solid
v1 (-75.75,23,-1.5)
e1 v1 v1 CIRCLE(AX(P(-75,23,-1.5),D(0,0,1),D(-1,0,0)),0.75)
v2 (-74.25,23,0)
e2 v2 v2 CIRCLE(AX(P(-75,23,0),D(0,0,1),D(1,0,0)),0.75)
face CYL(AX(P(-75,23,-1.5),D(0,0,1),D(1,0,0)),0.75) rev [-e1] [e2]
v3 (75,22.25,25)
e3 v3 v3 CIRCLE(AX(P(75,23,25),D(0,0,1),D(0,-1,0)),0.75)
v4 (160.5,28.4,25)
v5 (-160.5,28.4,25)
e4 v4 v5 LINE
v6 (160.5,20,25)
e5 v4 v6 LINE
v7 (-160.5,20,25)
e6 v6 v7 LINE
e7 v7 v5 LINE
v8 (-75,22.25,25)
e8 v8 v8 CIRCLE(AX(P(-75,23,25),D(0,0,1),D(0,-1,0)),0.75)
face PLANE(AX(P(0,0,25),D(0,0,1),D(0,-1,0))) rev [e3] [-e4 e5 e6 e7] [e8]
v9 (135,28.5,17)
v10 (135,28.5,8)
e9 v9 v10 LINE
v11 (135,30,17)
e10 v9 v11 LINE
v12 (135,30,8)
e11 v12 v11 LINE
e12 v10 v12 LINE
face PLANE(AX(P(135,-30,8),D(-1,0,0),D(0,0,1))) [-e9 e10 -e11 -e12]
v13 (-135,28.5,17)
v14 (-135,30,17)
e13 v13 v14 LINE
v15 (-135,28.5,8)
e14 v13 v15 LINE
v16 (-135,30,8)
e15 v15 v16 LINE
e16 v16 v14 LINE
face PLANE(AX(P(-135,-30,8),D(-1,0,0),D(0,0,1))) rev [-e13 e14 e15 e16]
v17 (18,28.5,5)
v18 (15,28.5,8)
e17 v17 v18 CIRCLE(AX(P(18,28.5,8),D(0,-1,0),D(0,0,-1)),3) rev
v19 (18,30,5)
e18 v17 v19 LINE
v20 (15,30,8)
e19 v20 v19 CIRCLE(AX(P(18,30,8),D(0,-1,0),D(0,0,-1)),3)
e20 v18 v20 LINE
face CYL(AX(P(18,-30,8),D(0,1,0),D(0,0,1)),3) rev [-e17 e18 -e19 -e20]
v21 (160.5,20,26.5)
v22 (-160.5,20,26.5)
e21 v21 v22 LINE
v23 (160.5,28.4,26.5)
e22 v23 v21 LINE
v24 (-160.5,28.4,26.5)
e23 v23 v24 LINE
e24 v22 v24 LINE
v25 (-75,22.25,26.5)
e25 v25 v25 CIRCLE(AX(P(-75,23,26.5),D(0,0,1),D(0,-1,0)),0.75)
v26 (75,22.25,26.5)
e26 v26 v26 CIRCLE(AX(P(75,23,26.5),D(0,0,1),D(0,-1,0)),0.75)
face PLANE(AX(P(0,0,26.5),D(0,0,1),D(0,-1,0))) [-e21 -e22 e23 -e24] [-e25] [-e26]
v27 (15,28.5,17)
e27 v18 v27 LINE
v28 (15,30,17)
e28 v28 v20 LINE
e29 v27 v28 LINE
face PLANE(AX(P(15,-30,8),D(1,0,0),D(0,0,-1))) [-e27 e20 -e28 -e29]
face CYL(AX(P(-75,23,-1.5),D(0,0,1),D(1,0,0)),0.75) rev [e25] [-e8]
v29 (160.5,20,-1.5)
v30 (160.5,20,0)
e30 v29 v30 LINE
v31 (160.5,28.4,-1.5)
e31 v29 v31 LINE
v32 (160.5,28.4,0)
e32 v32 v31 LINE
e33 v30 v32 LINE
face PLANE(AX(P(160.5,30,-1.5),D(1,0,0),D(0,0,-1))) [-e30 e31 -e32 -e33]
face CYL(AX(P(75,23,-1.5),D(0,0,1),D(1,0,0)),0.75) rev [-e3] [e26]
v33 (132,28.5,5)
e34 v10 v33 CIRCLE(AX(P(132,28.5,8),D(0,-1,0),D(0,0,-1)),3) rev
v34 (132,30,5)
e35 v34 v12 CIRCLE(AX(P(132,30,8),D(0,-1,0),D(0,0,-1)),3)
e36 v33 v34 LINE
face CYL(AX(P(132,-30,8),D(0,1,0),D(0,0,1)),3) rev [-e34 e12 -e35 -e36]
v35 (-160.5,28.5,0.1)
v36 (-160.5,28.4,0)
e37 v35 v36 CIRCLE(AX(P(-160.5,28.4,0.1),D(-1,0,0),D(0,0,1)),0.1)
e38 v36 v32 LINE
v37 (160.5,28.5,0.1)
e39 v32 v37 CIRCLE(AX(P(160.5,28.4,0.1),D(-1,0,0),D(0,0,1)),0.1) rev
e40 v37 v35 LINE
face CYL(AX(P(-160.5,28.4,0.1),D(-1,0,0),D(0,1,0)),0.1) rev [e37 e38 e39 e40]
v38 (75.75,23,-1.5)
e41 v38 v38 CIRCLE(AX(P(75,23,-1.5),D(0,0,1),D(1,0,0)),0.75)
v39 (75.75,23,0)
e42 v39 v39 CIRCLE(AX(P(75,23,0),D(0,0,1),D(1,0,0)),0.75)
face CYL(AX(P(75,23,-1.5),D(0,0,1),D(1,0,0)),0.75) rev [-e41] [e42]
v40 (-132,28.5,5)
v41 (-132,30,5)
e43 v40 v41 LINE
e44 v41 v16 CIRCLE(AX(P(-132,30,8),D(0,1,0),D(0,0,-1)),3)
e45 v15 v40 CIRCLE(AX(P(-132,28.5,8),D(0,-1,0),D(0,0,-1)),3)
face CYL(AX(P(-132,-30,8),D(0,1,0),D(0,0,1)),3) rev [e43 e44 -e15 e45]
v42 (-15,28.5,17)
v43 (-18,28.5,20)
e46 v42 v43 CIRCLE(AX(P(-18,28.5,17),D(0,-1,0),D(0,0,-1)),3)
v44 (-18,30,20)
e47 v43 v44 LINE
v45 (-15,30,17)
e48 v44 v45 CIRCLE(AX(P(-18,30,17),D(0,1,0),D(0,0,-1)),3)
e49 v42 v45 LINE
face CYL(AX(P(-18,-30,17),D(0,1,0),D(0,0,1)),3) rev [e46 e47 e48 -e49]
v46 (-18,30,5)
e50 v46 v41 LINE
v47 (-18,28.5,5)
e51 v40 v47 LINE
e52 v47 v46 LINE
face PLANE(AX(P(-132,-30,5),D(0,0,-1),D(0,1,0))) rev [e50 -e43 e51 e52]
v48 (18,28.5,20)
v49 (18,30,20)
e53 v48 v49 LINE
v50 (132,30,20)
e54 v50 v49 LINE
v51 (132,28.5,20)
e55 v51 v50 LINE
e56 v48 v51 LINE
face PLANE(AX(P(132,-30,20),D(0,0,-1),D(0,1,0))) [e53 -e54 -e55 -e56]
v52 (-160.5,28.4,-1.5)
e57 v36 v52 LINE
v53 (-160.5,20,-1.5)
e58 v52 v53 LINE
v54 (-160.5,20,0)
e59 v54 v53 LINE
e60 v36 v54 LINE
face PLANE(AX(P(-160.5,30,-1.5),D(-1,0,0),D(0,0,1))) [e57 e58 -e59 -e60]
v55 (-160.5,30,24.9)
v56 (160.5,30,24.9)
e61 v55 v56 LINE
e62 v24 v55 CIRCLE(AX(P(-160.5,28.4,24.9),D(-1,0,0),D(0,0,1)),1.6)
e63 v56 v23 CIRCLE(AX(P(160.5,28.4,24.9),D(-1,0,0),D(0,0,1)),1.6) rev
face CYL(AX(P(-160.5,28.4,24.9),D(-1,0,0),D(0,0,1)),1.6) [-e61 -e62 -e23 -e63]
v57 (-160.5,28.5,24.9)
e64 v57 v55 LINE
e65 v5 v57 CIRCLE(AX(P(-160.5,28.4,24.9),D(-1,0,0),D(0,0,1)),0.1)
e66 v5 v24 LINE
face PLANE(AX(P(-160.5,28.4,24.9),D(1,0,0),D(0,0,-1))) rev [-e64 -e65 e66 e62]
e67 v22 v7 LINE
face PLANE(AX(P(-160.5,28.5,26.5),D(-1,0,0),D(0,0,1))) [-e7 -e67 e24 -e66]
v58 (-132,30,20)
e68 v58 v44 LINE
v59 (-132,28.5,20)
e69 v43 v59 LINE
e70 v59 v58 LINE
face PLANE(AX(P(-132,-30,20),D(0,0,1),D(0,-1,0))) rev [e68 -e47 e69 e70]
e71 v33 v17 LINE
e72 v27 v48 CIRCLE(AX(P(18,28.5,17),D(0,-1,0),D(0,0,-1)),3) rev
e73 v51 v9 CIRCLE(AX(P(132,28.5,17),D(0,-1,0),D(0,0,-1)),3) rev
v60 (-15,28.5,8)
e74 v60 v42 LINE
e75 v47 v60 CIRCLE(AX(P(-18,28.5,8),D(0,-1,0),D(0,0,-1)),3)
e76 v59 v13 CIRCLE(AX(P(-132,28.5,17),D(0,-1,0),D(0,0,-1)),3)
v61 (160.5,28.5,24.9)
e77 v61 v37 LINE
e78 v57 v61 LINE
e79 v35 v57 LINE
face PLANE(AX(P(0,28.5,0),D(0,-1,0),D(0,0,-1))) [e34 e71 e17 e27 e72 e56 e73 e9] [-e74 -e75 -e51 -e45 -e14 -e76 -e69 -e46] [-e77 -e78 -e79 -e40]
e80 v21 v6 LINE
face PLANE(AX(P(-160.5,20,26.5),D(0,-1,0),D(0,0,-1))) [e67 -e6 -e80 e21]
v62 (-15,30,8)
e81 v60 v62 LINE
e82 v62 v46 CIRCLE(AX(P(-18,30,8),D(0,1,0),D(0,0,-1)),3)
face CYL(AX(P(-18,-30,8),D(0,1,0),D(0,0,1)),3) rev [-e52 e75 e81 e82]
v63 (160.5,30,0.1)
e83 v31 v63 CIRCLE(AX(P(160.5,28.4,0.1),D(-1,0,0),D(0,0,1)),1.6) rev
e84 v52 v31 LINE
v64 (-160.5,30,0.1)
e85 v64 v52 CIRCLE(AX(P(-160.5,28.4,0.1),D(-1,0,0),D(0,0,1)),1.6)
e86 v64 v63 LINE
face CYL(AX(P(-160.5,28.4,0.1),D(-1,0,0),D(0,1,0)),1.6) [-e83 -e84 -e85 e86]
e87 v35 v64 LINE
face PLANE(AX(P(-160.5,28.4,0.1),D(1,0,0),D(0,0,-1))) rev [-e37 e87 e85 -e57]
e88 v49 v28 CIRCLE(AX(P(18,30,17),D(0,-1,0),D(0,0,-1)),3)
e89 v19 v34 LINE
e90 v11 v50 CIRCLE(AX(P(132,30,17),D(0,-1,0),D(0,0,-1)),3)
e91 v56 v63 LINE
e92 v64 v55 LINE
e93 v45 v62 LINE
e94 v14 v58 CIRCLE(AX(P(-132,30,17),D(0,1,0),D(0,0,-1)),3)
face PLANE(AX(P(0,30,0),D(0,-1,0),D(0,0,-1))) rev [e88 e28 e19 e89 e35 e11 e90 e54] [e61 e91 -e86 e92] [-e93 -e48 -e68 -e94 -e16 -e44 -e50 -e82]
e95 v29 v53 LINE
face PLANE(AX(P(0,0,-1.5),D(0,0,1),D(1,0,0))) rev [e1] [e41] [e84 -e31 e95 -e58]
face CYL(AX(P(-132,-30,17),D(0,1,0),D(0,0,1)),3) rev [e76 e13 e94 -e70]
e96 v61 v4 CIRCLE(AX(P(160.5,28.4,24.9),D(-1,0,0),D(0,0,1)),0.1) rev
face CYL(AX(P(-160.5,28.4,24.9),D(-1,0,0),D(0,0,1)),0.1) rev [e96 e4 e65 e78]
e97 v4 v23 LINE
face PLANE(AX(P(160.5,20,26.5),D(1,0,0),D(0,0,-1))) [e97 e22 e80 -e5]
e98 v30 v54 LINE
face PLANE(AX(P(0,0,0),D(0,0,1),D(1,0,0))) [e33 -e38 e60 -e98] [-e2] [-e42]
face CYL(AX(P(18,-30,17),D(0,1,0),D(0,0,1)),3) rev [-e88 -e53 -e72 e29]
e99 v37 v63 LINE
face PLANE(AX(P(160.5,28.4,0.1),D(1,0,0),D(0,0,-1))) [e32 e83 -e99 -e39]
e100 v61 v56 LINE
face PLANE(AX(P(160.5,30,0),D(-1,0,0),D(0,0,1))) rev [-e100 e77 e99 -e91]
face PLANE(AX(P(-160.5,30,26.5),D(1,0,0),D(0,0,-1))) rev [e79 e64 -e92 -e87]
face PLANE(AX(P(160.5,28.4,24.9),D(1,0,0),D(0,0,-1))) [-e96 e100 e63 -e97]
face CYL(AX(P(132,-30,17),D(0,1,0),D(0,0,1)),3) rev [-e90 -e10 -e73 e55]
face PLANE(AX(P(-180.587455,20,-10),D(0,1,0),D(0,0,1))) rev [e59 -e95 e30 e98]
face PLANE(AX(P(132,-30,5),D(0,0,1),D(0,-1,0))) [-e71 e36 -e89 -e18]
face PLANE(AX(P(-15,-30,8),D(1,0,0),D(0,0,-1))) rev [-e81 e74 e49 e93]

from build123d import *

# Parameters (mm, degrees)
SKETCH_1_W                         = 321
SKETCH_1_H                         = 60
SM_BASE_FLANGE_1_DEPTH             = 1.5
SM_EDGE_FLANGE_1_STRIP_W           = 6.2
SM_EDGE_FLANGE_1_STRIP_H           = 1.5
SM_EDGE_FLANGE_1_STRIP_CUT_DEPTH   = 321
SM_EDGE_FLANGE_1_STRIP_2_W         = 6.2
SM_EDGE_FLANGE_1_STRIP_2_H         = 1.5
SM_EDGE_FLANGE_1_STRIP_CUT_2_DEPTH = 321
SM_EDGE_FLANGE_1_DEPTH             = 321
SM_EDGE_FLANGE_1_BEND_DEPTH        = 321
SM_EDGE_FLANGE_2_STRIP_W           = 6.2
SM_EDGE_FLANGE_2_STRIP_H           = 1.5
SM_EDGE_FLANGE_2_STRIP_CUT_DEPTH   = 321
SM_EDGE_FLANGE_2_STRIP_2_W         = 6.2
SM_EDGE_FLANGE_2_STRIP_2_H         = 1.5
SM_EDGE_FLANGE_2_STRIP_CUT_2_DEPTH = 321
SM_EDGE_FLANGE_2_DEPTH             = 321
SM_EDGE_FLANGE_2_BEND_DEPTH        = 321
CUT_EXTRUDE_2_DEPTH                = 174.385408844
CUT_EXTRUDE_3_DEPTH                = 57
CUT_EXTRUDE_3_DEPTH_BACK           = 10
SKETCH_20_W                        = 341.087454661
SKETCH_20_H                        = 74.910603127
CUT_EXTRUDE_4_DEPTH                = 166.663061664
CUT_EXTRUDE_4_DEPTH_BACK           = 166.663061664
SKETCH_21_R                        = 0.75


# Sheet-metal steps are written as plain solids
with BuildPart() as part:
    # Sketch 1 → 基体-法兰1 (new body)
    with BuildSketch(Plane.XY):
        Rectangle(SKETCH_1_W, SKETCH_1_H)
    extrude(amount=-SM_BASE_FLANGE_1_DEPTH)

    # 边线-法兰1 strip (across the edge) → 边线-法兰1 strip cut (cut)
    with BuildSketch(Plane(origin=(160.5, 30, 0), x_dir=(0, -1, 0), z_dir=(-1, 0, 0))):
        with Locations((-1.5, -0.75)):
            Rectangle(SM_EDGE_FLANGE_1_STRIP_W, SM_EDGE_FLANGE_1_STRIP_H)
    extrude(amount=SM_EDGE_FLANGE_1_STRIP_CUT_DEPTH, mode=Mode.SUBTRACT)

    # 边线-法兰1 strip 2 (across the edge) → 边线-法兰1 strip cut 2 (cut)
    with BuildSketch(Plane(origin=(-160.5, -30, 0), x_dir=(0, 1, 0), z_dir=(1, 0, 0))):
        with Locations((-1.5, -0.75)):
            Rectangle(SM_EDGE_FLANGE_1_STRIP_2_W, SM_EDGE_FLANGE_1_STRIP_2_H)
    extrude(amount=SM_EDGE_FLANGE_1_STRIP_CUT_2_DEPTH, mode=Mode.SUBTRACT)

    # 边线-法兰1 section (across the edge) → 边线-法兰1 (add)
    with BuildSketch(Plane(origin=(160.5, 30, 0), x_dir=(0, -1, 0), z_dir=(-1, 0, 0))):
        with BuildLine():
            Line((0, 0.1), (0, 26.5))
            Line((0, 26.5), (1.5, 26.5))
            Line((1.5, 26.5), (1.5, 0.1))
            ThreePointArc((1.5, 0.1), (1.529289322, 0.029289322), (1.6, 0))
            Line((1.6, 0), (1.6, -1.5))
            ThreePointArc((1.6, -1.5), (0.46862915, -1.03137085), (0, 0.1))
        make_face()
    extrude(amount=SM_EDGE_FLANGE_1_DEPTH)

    # 边线-法兰1 section 2 (across the edge) → 边线-法兰1 bend (add)
    with BuildSketch(Plane(origin=(-160.5, -30, 0), x_dir=(0, 1, 0), z_dir=(1, 0, 0))):
        with BuildLine():
            Line((0, 0.1), (0, 26.5))
            Line((0, 26.5), (1.5, 26.5))
            Line((1.5, 26.5), (1.5, 0.1))
            ThreePointArc((1.5, 0.1), (1.529289322, 0.029289322), (1.6, 0))
            Line((1.6, 0), (1.6, -1.5))
            ThreePointArc((1.6, -1.5), (0.46862915, -1.03137085), (0, 0.1))
        make_face()
    extrude(amount=SM_EDGE_FLANGE_1_BEND_DEPTH)

    # 边线-法兰2 strip (across the edge) → 边线-法兰2 strip cut (cut)
    with BuildSketch(Plane(origin=(160.5, 28.5, 26.5), x_dir=(0, 0, -1), z_dir=(-1, 0, 0))):
        with Locations((-1.5, -0.75)):
            Rectangle(SM_EDGE_FLANGE_2_STRIP_W, SM_EDGE_FLANGE_2_STRIP_H)
    extrude(amount=SM_EDGE_FLANGE_2_STRIP_CUT_DEPTH, mode=Mode.SUBTRACT)

    # 边线-法兰2 strip 2 (across the edge) → 边线-法兰2 strip cut 2 (cut)
    with BuildSketch(Plane(origin=(-160.5, -28.5, 26.5), x_dir=(0, 0, -1), z_dir=(1, 0, 0))):
        with Locations((-1.5, -0.75)):
            Rectangle(SM_EDGE_FLANGE_2_STRIP_2_W, SM_EDGE_FLANGE_2_STRIP_2_H)
    extrude(amount=SM_EDGE_FLANGE_2_STRIP_CUT_2_DEPTH, mode=Mode.SUBTRACT)

    # 边线-法兰2 section (across the edge) → 边线-法兰2 (add)
    with BuildSketch(Plane(origin=(160.5, 28.5, 26.5), x_dir=(0, 0, -1), z_dir=(-1, 0, 0))):
        with BuildLine():
            Line((0, 0.1), (0, 8.5))
            Line((0, 8.5), (1.5, 8.5))
            Line((1.5, 8.5), (1.5, 0.1))
            ThreePointArc((1.5, 0.1), (1.529289322, 0.029289322), (1.6, 0))
            Line((1.6, 0), (1.6, -1.5))
            ThreePointArc((1.6, -1.5), (0.46862915, -1.03137085), (0, 0.1))
        make_face()
    extrude(amount=SM_EDGE_FLANGE_2_DEPTH)

    # 边线-法兰2 section 2 (across the edge) → 边线-法兰2 bend (add)
    with BuildSketch(Plane(origin=(-160.5, -28.5, 26.5), x_dir=(0, 0, -1), z_dir=(1, 0, 0))):
        with BuildLine():
            Line((0, 0.1), (0, 8.5))
            Line((0, 8.5), (1.5, 8.5))
            Line((1.5, 8.5), (1.5, 0.1))
            ThreePointArc((1.5, 0.1), (1.529289322, 0.029289322), (1.6, 0))
            Line((1.6, 0), (1.6, -1.5))
            ThreePointArc((1.6, -1.5), (0.46862915, -1.03137085), (0, 0.1))
        make_face()
    extrude(amount=SM_EDGE_FLANGE_2_BEND_DEPTH)

    # 草图19 → 切除-拉伸2 (cut, through all)
    with BuildSketch(Plane(origin=(0, 30, 0), x_dir=(1, 0, 0), z_dir=(0, 1, 0))):
        with BuildLine():
            Line((-132, -5), (-18, -5))
            ThreePointArc((-18, -5), (-15.878679656, -5.878679656), (-15, -8))
            Line((-15, -8), (-15, -17))
            ThreePointArc((-15, -17), (-15.878679656, -19.121320344), (-18, -20))
            Line((-18, -20), (-132, -20))
            ThreePointArc((-132, -20), (-134.121320344, -19.121320344), (-135, -17))
            Line((-135, -17), (-135, -8))
            ThreePointArc((-135, -8), (-134.121320344, -5.878679656), (-132, -5))
        make_face()
    cut_extrude_2 = extrude(amount=-CUT_EXTRUDE_2_DEPTH, mode=Mode.SUBTRACT)

    # 镜向1: 切除-拉伸2 across plane
    add(cut_extrude_2.mirror(Plane(origin=(0, 0, 0), x_dir=(0, 0, 1), z_dir=(1, 0, 0))), mode=Mode.SUBTRACT)

    # 草图20 → 切除-拉伸3 (cut, two sides: drawn at the far end of the back side and taken through both)
    with BuildSketch(Plane.XY.offset(-CUT_EXTRUDE_3_DEPTH_BACK)):
        with Locations((-10.043727331, -17.455301564)):
            Rectangle(SKETCH_20_W, SKETCH_20_H)
    extrude(amount=CUT_EXTRUDE_3_DEPTH + CUT_EXTRUDE_3_DEPTH_BACK, mode=Mode.SUBTRACT)

    # 草图21 → 切除-拉伸4 (cut, two sides: drawn at the far end of the back side and taken through both)
    with BuildSketch(Plane.XY.offset(26.5).offset(-CUT_EXTRUDE_4_DEPTH_BACK)):
        with Locations(Location((75, 23, 0), (0, 0, 270))):
            Circle(SKETCH_21_R)
        with Locations(Location((-75, 23, 0), (0, 0, 270))):
            Circle(SKETCH_21_R)
    extrude(amount=CUT_EXTRUDE_4_DEPTH + CUT_EXTRUDE_4_DEPTH_BACK, mode=Mode.SUBTRACT)


solid = part.part
